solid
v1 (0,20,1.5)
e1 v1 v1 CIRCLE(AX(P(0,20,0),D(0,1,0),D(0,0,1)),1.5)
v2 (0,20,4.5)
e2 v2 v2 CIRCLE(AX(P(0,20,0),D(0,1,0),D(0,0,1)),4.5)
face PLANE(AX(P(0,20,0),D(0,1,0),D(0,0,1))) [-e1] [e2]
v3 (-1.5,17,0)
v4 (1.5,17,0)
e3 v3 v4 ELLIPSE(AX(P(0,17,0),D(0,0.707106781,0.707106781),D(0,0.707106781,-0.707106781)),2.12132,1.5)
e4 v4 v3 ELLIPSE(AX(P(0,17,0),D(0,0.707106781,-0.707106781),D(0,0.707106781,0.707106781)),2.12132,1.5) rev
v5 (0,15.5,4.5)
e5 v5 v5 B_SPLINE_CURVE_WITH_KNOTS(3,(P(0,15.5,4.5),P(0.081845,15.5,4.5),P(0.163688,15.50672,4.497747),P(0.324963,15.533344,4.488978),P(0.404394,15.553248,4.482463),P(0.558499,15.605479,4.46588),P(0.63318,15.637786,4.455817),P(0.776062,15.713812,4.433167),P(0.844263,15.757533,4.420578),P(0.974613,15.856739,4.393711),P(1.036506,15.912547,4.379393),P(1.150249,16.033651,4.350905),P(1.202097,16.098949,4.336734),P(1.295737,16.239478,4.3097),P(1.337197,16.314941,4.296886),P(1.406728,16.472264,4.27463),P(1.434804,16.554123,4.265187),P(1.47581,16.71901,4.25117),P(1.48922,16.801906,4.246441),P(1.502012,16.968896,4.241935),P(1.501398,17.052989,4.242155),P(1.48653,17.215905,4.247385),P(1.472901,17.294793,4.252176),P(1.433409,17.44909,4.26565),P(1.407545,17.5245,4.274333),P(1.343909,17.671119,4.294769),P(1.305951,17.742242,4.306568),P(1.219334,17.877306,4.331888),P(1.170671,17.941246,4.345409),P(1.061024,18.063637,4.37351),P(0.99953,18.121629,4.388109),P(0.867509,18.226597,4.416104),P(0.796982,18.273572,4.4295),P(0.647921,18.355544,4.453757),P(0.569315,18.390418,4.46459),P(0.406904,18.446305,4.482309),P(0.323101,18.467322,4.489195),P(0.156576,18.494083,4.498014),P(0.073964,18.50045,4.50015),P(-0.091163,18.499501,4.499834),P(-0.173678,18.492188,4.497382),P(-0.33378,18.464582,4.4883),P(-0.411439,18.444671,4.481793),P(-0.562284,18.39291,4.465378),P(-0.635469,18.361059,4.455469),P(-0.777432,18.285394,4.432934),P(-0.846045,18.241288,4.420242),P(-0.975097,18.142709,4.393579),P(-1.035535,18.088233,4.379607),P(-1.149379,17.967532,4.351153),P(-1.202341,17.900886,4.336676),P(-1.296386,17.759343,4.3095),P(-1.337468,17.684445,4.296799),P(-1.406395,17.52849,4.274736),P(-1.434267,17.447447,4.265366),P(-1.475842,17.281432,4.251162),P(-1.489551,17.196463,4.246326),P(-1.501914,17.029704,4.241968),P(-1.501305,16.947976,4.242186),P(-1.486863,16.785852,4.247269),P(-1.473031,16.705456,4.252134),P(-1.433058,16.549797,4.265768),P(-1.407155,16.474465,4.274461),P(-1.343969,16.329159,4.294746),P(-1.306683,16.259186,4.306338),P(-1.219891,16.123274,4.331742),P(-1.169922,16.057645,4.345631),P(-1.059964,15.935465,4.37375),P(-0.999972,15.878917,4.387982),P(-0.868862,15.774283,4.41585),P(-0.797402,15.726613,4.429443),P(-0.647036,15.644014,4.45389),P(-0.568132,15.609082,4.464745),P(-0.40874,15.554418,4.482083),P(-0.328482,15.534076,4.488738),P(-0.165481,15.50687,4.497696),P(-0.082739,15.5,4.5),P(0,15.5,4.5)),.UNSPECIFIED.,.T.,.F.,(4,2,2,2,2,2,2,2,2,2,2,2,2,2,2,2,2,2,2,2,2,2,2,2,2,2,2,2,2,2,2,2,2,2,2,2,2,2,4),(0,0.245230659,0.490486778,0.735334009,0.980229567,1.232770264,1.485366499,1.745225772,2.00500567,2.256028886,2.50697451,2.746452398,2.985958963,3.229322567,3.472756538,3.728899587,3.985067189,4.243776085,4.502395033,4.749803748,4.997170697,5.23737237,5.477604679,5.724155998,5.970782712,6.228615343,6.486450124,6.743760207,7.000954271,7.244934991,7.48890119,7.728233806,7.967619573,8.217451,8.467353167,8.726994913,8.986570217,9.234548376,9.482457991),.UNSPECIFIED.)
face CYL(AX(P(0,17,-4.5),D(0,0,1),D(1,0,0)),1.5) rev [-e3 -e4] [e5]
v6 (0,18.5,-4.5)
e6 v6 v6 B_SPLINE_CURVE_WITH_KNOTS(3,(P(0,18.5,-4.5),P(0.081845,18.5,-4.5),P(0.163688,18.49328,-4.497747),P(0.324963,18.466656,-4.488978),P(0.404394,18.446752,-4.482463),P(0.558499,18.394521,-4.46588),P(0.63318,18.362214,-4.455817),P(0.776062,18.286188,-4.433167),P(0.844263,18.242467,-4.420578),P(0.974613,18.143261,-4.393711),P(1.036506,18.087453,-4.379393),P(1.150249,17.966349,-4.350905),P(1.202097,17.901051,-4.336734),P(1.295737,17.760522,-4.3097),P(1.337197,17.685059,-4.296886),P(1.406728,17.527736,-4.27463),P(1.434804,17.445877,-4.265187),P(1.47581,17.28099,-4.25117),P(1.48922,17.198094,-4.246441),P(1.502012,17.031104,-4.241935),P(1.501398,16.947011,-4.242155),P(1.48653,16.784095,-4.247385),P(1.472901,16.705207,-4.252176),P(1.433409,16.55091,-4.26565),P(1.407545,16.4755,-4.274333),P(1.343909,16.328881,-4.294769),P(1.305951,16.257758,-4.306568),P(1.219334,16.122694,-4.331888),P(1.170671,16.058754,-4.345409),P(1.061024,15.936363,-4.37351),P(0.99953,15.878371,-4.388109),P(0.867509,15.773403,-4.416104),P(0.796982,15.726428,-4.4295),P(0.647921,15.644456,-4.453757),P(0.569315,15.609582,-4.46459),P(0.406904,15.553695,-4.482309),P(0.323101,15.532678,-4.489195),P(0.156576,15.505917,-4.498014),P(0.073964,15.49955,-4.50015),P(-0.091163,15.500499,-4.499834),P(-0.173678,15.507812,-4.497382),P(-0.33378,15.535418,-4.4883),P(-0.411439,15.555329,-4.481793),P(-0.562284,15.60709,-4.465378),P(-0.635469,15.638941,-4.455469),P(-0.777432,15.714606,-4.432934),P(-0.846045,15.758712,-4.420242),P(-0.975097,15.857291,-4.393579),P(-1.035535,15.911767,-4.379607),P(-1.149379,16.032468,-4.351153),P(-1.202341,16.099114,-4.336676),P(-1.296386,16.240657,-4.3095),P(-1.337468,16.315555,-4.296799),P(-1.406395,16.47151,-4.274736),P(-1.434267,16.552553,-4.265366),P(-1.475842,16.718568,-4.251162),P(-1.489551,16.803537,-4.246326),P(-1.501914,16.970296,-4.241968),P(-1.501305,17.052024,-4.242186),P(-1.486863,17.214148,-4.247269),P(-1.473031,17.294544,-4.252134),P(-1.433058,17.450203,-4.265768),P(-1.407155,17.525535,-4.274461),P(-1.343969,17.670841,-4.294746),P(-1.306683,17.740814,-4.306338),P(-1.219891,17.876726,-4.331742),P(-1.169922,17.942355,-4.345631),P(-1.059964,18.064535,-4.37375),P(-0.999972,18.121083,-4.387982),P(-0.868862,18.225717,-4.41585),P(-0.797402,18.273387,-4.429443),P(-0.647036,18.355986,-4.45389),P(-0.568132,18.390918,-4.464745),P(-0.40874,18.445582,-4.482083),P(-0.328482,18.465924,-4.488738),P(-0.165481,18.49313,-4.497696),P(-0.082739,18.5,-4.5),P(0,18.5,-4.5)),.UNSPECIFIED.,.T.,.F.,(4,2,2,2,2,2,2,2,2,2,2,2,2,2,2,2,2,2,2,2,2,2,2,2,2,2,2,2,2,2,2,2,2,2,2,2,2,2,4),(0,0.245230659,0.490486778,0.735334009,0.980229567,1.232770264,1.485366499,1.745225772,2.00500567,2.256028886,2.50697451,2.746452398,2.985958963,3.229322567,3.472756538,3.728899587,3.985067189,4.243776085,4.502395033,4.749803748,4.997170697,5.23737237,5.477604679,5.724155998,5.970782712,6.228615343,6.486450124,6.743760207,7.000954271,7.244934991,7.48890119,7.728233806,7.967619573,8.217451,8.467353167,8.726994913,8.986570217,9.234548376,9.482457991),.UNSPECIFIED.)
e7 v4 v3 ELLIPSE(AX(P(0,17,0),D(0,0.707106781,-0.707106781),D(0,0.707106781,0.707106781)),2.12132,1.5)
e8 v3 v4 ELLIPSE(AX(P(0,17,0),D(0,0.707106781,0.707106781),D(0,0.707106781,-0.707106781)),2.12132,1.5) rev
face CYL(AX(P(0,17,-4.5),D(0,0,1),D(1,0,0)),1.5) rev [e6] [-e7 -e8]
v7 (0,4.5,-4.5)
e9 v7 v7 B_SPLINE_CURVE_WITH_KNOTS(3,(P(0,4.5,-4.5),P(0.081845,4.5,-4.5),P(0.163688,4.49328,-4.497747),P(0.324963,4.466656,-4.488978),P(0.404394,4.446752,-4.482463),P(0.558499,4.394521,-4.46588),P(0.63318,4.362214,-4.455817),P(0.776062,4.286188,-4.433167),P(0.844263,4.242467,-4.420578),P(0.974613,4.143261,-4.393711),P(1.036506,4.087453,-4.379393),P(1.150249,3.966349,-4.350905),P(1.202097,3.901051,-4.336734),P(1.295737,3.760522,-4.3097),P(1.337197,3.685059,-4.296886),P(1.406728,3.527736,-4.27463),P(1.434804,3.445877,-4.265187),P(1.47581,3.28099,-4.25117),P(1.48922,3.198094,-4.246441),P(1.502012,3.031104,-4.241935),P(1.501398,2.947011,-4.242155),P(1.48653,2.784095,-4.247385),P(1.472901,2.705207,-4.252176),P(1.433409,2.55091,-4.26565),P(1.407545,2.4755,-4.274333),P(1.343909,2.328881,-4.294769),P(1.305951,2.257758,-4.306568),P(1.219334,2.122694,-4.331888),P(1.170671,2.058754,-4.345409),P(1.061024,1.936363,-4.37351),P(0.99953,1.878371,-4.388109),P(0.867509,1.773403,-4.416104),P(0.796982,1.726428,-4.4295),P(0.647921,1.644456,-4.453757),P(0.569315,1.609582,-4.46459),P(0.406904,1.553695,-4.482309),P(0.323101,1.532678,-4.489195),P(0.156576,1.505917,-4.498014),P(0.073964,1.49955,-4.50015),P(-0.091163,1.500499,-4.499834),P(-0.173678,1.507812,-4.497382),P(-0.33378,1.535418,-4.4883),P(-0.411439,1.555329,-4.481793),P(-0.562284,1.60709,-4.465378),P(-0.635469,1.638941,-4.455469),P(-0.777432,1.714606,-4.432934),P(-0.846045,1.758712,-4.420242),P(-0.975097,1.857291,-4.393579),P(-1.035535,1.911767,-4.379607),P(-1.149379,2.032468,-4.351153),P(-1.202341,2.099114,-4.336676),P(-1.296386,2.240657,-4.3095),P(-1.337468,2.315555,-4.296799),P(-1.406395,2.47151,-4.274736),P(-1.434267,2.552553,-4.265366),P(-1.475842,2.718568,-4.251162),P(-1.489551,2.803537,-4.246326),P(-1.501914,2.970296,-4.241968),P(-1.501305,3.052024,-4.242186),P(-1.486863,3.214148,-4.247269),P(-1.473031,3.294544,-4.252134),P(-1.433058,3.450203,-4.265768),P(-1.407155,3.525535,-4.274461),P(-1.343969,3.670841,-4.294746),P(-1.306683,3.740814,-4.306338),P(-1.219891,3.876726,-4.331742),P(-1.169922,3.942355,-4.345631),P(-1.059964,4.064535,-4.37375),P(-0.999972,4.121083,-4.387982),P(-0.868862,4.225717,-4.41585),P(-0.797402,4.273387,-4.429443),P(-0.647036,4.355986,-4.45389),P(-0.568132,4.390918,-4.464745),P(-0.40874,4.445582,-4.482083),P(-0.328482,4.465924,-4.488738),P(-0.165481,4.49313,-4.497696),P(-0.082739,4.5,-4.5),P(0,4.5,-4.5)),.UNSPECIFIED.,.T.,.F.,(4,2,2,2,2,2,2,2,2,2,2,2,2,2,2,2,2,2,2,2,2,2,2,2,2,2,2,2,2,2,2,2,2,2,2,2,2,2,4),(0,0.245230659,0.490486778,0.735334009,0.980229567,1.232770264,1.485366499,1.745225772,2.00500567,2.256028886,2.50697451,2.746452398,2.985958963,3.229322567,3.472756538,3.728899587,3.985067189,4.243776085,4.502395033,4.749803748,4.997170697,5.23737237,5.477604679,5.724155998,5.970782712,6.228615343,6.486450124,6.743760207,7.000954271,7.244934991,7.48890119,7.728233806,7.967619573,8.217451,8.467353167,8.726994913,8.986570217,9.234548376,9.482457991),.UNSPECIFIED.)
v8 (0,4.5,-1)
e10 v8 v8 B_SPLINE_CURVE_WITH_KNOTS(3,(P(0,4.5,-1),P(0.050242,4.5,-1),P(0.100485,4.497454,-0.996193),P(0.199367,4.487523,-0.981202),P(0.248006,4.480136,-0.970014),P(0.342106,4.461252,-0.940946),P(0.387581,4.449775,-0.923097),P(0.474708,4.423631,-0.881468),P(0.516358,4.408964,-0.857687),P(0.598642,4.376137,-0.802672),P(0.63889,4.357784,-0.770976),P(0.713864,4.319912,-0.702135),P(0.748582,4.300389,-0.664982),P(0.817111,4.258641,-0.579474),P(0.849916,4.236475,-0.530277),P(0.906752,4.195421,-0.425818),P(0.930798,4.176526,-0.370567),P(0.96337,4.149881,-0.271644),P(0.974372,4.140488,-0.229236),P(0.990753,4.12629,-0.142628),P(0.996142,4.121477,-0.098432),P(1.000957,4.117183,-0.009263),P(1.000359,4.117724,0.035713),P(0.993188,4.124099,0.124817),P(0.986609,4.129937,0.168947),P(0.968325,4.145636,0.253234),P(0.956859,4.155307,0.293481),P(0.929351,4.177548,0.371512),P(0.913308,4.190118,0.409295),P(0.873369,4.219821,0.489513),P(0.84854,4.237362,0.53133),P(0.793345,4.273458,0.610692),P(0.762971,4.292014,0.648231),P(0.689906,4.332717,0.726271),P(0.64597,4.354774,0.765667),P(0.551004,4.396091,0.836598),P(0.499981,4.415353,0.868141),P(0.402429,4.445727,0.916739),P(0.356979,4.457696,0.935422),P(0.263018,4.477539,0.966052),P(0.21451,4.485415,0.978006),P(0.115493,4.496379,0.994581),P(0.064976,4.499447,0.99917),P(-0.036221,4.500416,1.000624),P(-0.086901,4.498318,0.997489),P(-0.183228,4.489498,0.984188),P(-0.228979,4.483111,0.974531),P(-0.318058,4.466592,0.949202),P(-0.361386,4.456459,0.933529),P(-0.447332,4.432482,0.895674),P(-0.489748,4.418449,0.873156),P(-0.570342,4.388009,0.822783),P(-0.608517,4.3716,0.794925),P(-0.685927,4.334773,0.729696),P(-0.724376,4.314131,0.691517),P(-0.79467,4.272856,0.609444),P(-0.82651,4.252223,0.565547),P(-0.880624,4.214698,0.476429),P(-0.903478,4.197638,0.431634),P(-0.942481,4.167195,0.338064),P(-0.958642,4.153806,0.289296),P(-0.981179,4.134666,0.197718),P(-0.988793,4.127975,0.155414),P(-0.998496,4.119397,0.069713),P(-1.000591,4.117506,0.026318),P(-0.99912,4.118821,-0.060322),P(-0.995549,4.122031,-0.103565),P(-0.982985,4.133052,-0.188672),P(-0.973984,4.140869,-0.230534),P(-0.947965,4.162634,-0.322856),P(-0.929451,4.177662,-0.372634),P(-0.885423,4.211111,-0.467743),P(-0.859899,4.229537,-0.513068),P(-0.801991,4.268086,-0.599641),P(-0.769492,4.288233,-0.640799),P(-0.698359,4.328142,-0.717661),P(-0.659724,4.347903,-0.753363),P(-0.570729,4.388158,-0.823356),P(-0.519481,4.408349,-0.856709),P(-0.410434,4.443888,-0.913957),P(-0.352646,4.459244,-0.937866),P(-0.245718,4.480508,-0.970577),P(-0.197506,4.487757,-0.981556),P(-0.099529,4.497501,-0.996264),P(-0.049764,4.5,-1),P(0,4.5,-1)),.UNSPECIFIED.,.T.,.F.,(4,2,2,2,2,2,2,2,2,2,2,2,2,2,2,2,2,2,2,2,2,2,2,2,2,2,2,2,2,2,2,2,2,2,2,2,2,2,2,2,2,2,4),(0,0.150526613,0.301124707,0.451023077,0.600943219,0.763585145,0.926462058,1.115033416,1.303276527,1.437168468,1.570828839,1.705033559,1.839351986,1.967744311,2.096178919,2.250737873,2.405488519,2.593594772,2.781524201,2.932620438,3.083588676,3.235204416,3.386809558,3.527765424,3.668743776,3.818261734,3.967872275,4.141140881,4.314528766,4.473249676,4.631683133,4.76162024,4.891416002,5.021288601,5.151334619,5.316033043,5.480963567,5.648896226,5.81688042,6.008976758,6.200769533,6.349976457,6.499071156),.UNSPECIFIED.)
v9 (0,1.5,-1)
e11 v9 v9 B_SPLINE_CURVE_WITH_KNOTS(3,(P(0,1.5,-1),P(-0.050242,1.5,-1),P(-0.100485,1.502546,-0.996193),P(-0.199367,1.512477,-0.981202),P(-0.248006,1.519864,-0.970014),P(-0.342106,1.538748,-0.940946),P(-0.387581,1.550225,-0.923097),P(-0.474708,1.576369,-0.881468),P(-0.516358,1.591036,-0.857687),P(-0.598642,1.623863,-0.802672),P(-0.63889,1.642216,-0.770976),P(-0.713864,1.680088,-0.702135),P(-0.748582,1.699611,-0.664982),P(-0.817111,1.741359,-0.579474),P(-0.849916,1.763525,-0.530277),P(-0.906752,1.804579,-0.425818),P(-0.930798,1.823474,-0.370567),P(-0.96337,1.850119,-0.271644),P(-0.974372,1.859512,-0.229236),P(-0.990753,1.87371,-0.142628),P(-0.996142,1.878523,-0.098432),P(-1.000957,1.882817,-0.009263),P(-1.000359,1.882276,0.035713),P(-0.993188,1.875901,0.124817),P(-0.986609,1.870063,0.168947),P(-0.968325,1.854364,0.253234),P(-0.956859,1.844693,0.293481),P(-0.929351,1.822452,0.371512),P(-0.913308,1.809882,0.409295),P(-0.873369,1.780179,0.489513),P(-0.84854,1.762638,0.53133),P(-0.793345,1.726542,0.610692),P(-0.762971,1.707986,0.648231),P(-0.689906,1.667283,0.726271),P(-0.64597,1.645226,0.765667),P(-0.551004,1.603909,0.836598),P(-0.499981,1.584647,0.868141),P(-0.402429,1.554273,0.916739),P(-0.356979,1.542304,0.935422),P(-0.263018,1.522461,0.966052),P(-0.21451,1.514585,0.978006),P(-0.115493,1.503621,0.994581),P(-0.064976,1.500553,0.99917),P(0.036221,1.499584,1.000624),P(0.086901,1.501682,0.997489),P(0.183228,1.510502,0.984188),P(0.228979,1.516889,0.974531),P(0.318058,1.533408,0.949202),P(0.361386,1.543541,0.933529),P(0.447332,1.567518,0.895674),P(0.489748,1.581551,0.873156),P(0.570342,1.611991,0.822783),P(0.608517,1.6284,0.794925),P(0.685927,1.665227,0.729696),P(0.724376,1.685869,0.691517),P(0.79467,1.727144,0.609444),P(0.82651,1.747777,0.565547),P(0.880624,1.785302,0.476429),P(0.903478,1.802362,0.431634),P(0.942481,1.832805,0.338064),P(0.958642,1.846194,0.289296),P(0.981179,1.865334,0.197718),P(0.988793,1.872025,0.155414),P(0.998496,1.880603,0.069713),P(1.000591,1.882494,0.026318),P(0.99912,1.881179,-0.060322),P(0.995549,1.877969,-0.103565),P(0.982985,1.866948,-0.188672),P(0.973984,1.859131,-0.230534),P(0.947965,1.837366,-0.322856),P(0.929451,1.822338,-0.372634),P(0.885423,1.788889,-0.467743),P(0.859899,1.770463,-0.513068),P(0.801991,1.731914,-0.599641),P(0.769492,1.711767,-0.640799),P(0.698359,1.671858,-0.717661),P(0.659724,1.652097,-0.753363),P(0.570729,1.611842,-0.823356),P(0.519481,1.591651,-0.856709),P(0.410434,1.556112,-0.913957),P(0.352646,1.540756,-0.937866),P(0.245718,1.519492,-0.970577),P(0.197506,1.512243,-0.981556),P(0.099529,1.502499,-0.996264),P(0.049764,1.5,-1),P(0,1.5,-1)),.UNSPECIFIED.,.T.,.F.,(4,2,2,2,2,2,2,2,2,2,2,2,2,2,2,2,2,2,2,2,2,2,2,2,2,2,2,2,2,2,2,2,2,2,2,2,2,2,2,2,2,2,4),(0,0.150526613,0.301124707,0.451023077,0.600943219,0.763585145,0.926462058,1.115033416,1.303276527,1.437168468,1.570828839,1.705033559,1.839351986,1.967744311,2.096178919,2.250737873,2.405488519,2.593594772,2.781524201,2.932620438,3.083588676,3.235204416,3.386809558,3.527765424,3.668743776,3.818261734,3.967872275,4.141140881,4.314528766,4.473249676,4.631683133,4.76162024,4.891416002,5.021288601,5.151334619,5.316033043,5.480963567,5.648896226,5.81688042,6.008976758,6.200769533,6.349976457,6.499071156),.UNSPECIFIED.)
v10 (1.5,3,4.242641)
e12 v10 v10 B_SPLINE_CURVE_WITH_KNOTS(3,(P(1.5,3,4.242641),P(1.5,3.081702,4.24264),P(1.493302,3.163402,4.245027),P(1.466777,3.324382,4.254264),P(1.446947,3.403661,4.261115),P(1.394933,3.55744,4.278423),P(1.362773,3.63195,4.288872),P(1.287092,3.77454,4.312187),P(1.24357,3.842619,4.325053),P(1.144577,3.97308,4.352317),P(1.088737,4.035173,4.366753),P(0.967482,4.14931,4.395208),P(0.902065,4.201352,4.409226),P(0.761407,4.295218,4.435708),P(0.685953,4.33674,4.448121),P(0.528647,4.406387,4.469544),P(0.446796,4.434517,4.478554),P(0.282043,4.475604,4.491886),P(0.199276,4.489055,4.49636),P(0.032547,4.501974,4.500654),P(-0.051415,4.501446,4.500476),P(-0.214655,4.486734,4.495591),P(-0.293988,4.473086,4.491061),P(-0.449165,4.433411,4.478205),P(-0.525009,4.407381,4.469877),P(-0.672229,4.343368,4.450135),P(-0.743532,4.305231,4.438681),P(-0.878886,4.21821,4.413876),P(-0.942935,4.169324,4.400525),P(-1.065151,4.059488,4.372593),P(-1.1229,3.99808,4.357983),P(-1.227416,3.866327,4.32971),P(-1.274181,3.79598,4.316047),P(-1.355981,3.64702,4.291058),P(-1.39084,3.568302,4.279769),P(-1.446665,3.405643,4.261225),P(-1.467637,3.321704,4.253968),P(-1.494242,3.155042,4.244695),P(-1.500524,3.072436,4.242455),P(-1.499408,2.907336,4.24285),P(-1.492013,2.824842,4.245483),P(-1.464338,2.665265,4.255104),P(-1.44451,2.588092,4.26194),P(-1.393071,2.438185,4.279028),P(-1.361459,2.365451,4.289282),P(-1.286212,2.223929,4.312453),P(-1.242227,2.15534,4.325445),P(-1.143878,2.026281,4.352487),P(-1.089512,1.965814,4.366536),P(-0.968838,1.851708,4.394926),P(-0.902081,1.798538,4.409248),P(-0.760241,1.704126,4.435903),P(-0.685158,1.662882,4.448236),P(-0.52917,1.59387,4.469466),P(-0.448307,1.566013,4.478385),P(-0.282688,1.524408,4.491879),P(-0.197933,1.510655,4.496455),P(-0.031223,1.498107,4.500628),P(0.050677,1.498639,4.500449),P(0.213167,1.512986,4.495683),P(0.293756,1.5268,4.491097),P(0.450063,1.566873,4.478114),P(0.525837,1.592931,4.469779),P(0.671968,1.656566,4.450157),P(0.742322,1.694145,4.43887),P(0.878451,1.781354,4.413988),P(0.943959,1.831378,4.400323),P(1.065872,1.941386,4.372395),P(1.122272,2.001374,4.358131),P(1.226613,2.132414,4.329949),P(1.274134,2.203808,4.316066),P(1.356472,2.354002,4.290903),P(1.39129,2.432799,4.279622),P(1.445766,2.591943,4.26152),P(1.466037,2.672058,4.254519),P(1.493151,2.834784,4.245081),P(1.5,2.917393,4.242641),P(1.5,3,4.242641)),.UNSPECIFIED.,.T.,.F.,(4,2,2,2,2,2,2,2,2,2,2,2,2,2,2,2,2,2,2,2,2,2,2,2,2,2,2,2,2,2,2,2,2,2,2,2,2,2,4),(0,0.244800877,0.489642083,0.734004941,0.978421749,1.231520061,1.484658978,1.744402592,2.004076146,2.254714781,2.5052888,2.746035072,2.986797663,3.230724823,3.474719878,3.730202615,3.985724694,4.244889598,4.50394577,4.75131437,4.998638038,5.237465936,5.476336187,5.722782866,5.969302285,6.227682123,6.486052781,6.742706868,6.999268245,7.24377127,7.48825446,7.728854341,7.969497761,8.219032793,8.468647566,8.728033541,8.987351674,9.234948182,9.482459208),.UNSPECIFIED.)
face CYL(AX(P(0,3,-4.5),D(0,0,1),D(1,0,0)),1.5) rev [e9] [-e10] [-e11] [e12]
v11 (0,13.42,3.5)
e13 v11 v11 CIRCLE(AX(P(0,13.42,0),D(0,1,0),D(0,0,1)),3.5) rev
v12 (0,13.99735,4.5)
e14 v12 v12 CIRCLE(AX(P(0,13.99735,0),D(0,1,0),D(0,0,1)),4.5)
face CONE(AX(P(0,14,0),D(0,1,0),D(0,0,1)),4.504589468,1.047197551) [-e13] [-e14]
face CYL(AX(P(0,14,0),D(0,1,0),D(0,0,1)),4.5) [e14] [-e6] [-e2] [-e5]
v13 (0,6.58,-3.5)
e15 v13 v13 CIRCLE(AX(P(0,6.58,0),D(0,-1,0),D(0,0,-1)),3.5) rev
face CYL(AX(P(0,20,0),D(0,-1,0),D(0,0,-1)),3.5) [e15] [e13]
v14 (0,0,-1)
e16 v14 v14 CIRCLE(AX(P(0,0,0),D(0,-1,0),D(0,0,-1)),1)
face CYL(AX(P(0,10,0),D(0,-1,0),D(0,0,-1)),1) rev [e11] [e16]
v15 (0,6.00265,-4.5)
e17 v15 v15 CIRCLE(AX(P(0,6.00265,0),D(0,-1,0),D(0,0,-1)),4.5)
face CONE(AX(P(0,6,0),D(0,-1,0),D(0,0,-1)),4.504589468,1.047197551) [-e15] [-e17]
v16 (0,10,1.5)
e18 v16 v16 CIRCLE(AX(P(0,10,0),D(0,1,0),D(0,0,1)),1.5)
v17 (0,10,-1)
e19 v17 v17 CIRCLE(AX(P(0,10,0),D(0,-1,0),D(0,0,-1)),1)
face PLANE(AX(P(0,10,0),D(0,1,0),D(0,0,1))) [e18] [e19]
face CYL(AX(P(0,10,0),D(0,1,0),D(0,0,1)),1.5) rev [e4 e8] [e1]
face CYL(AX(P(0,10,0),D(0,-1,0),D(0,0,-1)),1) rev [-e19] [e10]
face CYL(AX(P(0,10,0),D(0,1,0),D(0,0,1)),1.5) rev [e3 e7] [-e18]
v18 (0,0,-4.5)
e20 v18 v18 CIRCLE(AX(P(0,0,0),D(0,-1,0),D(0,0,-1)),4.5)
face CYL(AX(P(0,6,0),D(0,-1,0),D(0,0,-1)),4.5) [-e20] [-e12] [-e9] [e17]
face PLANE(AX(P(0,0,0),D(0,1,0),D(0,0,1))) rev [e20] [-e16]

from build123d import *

# Parameters (mm, degrees)
SKETCH_1_R               = 3.5
EXTRUDE_1_DEPTH          = 20
SKETCH_2_R               = 1.5
CUT_EXTRUDE_1_DEPTH      = 10
SKETCH_3_R               = 1
CUT_EXTRUDE_2_DEPTH      = 10
SKETCH_4_R               = 4.5
SKETCH_4_R_2             = 3.5
EXTRUDE_2_DEPTH          = 6
EXTRUDE_START            = -6
SKETCH_5_R               = 4.5
SKETCH_5_R_2             = 3.5
EXTRUDE_3_DEPTH          = 6
CHAMFER_1_SIZE           = 0.58
CHAMFER_1_SIZE_2         = 1.004589468
CUT_EXTRUDE_3_DEPTH      = 21.988091862
CUT_EXTRUDE_3_DEPTH_BACK = 21.988091862
SKETCH_6_R               = 1.5


with BuildPart() as part:
    # 草圖1 → 填料-伸長1 (new body)
    with BuildSketch(Plane(origin=(0, 0, 0), x_dir=(1, 0, 0), z_dir=(0, 1, 0))):
        with Locations(Location((0, 0, 0), (0, 0, 270))):
            Circle(SKETCH_1_R)
    extrude(amount=EXTRUDE_1_DEPTH)

    # 草圖2 → 除料-伸長1 (cut)
    with BuildSketch(Plane(origin=(0, 20, 0), x_dir=(1, 0, 0), z_dir=(0, 1, 0))):
        with Locations(Location((0, 0, 0), (0, 0, 270))):
            Circle(SKETCH_2_R)
    extrude(amount=-CUT_EXTRUDE_1_DEPTH, mode=Mode.SUBTRACT)

    # 草圖3 → 除料-伸長2 (cut)
    with BuildSketch(Plane.XZ):
        with Locations(Location((0, 0, 0), (0, 0, 270))):
            Circle(SKETCH_3_R)
    extrude(amount=-CUT_EXTRUDE_2_DEPTH, mode=Mode.SUBTRACT)

    # 草圖4 → 填料-伸長2 (add)
    with BuildSketch(Plane.XZ):
        with Locations(Location((0, 0, 0), (0, 0, 270))):
            Circle(SKETCH_4_R)
        with Locations(Location((0, 0, 0), (0, 0, 270))):
            Circle(SKETCH_4_R_2, mode=Mode.SUBTRACT)
    extrude(amount=-EXTRUDE_2_DEPTH)

    # 草圖5 → 填料-伸長3 (add)
    with BuildSketch(Plane(origin=(0, 20, 0), x_dir=(1, 0, 0), z_dir=(0, 1, 0)).offset(EXTRUDE_START)):
        with Locations(Location((0, 0, 0), (0, 0, 90))):
            Circle(SKETCH_5_R)
        with Locations(Location((0, 0, 0), (0, 0, 90))):
            Circle(SKETCH_5_R_2, mode=Mode.SUBTRACT)
    extrude(amount=EXTRUDE_3_DEPTH)

    # 導角1
    # the kernel refuses this chamfer: 1.004589468, 0.58 mm, written as the material it adds along each edge
    with BuildSketch(Plane(origin=(0, 14, 0), x_dir=(0, 0, 1), z_dir=(1, 0, 0))) as chamfer_1_piece_1_section:
        Polygon((3.5, CHAMFER_1_SIZE), (3.5 + CHAMFER_1_SIZE_2, 0), (3.5, 0), align=None)
    chamfer_1_piece_1 = revolve(axis=Axis((0, 14, 0), (0, -1, 0)), mode=Mode.PRIVATE)
    chamfer_1_piece_1 = chamfer_1_piece_1 & Plane(origin=(0, 13.715905857, 0), x_dir=(0, 0, -1), z_dir=(0, -1, 0)) * Cylinder(4.5, 19, mode=Mode.PRIVATE)
    add(chamfer_1_piece_1)
    with BuildSketch(Plane(origin=(0, 6, 0), x_dir=(0, 0, 1), z_dir=(-1, 0, 0))) as chamfer_1_piece_2_section:
        Polygon((3.5, CHAMFER_1_SIZE), (3.5 + CHAMFER_1_SIZE_2, 0), (3.5, 0), align=None)
    chamfer_1_piece_2 = revolve(axis=Axis((0, 6, 0), (0, 1, 0)), mode=Mode.PRIVATE)
    chamfer_1_piece_2 = chamfer_1_piece_2 & Plane(origin=(0, 6.284094143, 0), x_dir=(0, 0, -1), z_dir=(0, -1, 0)) * Cylinder(4.5, 19, mode=Mode.PRIVATE)
    add(chamfer_1_piece_2)

    # 草圖6 → 除料-伸長3 (cut, two sides: drawn at the far end of the back side and taken through both)
    with BuildSketch(Plane.XY.offset(-CUT_EXTRUDE_3_DEPTH_BACK)):
        with Locations((0, 17)):
            Circle(SKETCH_6_R)
        with Locations((0, 3)):
            Circle(SKETCH_6_R)
    extrude(amount=CUT_EXTRUDE_3_DEPTH + CUT_EXTRUDE_3_DEPTH_BACK, mode=Mode.SUBTRACT)


solid = part.part
